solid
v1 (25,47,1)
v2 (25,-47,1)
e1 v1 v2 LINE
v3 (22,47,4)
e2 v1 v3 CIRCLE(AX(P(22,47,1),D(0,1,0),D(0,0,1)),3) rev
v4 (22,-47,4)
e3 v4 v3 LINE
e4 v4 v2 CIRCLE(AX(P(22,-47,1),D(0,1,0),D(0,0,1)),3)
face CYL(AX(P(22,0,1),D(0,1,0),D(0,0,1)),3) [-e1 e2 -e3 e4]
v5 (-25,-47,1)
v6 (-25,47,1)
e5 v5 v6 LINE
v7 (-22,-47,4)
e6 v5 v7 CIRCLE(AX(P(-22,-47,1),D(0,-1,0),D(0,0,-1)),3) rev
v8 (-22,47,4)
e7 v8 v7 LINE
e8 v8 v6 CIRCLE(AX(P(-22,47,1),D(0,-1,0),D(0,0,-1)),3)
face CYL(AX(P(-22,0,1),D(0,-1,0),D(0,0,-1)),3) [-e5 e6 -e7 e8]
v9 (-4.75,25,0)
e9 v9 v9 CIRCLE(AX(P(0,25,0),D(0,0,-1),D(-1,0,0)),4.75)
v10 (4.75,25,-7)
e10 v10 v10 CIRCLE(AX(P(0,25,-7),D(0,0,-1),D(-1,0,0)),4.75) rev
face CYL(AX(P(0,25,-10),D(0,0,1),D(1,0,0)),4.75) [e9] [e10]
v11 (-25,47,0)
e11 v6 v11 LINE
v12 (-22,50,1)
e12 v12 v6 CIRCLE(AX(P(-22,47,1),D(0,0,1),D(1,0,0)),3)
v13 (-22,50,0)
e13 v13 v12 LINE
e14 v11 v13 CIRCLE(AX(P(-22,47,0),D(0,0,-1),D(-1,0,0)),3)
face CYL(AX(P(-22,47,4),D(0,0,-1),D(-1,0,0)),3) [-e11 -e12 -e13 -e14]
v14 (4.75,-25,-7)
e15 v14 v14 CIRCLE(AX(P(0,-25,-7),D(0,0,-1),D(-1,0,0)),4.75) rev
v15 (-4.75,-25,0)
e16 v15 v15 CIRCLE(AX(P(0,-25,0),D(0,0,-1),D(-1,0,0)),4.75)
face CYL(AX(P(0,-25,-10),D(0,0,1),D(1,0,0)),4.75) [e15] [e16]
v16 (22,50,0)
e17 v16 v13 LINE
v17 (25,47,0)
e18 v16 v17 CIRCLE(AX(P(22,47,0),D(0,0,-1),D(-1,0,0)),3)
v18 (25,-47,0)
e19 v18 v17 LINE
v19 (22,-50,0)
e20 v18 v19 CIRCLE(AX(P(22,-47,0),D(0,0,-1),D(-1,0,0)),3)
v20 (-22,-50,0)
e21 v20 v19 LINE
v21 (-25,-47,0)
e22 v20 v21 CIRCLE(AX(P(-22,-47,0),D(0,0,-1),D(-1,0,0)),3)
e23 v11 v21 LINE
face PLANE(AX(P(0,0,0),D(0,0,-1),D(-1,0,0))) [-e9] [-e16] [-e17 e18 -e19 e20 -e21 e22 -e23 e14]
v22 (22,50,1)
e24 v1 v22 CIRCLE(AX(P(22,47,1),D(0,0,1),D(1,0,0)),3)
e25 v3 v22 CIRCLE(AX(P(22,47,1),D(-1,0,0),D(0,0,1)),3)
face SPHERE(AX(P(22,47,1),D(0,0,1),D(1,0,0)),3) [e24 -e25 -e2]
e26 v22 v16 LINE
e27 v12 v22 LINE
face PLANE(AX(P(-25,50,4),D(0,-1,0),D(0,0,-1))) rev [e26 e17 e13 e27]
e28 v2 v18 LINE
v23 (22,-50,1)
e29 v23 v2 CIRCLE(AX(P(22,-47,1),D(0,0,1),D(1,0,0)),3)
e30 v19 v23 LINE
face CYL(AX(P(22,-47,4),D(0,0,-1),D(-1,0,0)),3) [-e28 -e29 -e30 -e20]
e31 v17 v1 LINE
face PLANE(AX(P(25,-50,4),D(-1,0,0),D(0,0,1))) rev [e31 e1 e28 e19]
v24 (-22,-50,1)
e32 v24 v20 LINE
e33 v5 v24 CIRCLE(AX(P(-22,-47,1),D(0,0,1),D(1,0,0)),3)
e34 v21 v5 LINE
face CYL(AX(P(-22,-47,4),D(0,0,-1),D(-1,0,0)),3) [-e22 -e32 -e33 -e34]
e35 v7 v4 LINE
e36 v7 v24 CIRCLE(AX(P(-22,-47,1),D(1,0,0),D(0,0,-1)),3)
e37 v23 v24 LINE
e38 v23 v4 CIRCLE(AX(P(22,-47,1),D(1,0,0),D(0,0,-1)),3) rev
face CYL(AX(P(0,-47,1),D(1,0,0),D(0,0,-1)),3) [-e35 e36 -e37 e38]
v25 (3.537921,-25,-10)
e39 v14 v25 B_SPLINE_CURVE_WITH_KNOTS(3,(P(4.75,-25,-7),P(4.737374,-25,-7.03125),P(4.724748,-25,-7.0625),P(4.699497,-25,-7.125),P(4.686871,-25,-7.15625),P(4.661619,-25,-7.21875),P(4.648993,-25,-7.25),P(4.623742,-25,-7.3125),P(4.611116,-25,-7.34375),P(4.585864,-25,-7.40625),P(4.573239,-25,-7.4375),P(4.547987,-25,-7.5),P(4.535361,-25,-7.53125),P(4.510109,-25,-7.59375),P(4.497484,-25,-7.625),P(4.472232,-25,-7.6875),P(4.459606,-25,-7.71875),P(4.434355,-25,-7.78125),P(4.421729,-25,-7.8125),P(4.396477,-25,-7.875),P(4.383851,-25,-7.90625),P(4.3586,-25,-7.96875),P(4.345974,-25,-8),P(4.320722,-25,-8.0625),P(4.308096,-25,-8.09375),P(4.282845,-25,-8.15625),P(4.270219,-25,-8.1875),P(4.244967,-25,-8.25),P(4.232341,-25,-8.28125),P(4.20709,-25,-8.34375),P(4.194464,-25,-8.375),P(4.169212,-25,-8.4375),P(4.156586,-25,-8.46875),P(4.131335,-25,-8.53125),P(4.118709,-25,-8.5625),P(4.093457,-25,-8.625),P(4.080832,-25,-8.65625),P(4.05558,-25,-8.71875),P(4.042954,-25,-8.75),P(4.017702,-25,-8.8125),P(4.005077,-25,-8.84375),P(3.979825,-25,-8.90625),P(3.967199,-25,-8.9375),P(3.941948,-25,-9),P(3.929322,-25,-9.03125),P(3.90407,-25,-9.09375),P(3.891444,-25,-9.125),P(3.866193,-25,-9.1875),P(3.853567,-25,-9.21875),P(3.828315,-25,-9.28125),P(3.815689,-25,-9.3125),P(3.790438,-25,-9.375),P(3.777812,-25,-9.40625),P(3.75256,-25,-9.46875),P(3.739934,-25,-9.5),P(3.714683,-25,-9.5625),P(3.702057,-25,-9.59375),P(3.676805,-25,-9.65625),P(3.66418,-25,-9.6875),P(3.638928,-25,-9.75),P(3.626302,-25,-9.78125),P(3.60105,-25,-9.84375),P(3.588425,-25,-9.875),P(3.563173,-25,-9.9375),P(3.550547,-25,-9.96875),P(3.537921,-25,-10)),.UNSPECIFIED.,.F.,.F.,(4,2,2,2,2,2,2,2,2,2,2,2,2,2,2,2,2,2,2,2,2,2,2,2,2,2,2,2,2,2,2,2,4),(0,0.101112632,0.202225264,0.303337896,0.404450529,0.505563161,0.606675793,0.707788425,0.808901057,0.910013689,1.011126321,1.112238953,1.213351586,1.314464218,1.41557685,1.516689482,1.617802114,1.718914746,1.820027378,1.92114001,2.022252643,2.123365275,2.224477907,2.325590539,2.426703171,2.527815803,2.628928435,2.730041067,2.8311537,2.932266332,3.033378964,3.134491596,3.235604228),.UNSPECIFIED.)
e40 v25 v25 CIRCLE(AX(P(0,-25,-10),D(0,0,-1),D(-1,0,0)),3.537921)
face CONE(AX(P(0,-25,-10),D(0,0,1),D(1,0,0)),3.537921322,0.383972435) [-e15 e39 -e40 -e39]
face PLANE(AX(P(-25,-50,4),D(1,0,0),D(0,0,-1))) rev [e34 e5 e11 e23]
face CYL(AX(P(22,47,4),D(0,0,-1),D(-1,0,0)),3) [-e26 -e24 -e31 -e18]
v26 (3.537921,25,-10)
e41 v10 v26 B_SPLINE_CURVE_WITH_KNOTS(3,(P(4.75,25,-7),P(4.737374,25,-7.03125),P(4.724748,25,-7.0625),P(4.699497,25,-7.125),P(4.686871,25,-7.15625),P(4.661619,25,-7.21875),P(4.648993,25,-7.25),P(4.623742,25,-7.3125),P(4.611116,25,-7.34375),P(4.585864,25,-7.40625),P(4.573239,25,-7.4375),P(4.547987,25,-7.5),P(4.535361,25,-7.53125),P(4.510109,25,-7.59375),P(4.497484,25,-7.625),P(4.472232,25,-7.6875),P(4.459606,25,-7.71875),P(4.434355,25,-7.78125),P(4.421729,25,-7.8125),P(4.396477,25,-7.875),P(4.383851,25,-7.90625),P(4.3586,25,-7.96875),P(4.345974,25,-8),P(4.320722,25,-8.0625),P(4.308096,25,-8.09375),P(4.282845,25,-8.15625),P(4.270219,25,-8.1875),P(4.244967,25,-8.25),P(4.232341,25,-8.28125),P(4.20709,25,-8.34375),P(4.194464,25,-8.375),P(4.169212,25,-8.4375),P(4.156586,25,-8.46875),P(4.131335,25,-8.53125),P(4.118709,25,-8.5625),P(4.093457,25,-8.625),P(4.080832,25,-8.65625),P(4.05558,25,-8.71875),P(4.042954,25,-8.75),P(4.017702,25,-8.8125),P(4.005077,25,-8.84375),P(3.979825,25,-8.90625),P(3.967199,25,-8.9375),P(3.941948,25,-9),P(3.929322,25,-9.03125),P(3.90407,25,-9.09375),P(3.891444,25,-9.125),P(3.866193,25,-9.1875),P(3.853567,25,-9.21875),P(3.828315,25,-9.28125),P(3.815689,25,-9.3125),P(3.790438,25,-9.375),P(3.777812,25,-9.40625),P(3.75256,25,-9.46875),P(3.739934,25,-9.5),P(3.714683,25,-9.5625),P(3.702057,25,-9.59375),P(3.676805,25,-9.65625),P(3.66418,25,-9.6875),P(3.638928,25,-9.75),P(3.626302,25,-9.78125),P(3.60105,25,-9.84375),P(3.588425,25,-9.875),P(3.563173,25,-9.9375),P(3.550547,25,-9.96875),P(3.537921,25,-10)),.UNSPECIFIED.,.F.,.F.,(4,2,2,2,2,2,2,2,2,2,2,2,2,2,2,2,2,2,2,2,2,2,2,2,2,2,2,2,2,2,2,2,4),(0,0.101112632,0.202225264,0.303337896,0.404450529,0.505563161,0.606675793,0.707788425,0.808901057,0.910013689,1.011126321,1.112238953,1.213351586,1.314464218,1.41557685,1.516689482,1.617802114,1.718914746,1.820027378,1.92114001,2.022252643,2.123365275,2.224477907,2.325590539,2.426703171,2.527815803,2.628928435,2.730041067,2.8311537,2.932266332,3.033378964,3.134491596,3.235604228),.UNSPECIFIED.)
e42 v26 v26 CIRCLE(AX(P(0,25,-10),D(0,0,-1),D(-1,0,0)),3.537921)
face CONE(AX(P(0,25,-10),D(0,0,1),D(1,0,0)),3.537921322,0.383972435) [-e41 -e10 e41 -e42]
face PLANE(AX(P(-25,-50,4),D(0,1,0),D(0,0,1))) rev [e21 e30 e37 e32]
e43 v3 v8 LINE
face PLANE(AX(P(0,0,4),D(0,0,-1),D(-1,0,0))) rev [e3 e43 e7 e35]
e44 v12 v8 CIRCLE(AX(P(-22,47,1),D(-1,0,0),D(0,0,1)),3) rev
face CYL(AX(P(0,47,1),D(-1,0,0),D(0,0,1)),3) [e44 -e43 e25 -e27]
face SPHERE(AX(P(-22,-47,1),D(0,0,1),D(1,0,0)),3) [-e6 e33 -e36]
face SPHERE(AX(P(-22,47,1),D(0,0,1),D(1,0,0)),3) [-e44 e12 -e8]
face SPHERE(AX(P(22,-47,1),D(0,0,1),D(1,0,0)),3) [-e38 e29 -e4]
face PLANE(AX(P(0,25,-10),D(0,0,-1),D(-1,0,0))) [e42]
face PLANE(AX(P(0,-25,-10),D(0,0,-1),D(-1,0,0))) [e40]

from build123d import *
from OCP.BRepFilletAPI import BRepFilletAPI_MakeChamfer

# Parameters (mm, degrees)
SKETCH1_W           = 50
SKETCH1_H           = 100
BOSS_EXTRUDE1_DEPTH = 4
FILLET1_R           = 3
FILLET2_R           = 3
SKETCH2_R           = 4.75
BOSS_EXTRUDE2_DEPTH = 10
CHAMFER1_SIZE       = 3
CHAMFER1_SIZE2      = 1.212078678


with BuildPart() as part:
    # Sketch1 → Boss-Extrude1 (new body)
    with BuildSketch(Plane.XY):
        Rectangle(SKETCH1_W, SKETCH1_H)
    extrude(amount=BOSS_EXTRUDE1_DEPTH)

    # Fillet1
    fillet1_edges = [part.edges().sort_by_distance(p)[0] for p in [
        (-25, 0, 4),
        (0, -50, 4),
        (25, 0, 4),
        (0, 50, 4),
    ]]
    fillet(fillet1_edges, radius=FILLET1_R)

    # Fillet2
    # the kernel refuses this fillet: 3 mm, written as the material it takes off along each edge
    with BuildSketch(Plane(origin=(-22, 47, 1), x_dir=(0, 1, 0), z_dir=(-1, 0, 0))) as fillet2_piece_1_section:
        Polygon((0, 0), (FILLET2_R, 0), (FILLET2_R, -FILLET2_R), (0, -FILLET2_R), align=None)
    fillet2_piece_1 = extrude(amount=FILLET2_R, mode=Mode.PRIVATE)
    fillet2_piece_1 = fillet2_piece_1 - Plane(origin=(-22, 47, 1), x_dir=(0, -0.7071067811865475, -0.7071067811865475), z_dir=(-1, 0, 0)) * Sphere(FILLET2_R, mode=Mode.PRIVATE)
    add(fillet2_piece_1, mode=Mode.SUBTRACT)
    with BuildSketch(Plane(origin=(22, 47, 1), x_dir=(0, 1, 0), z_dir=(1, 0, 0))) as fillet2_piece_2_section:
        Polygon((0, 0), (FILLET2_R, 0), (FILLET2_R, FILLET2_R), (0, FILLET2_R), align=None)
    fillet2_piece_2 = extrude(amount=FILLET2_R, mode=Mode.PRIVATE)
    fillet2_piece_2 = fillet2_piece_2 - Plane(origin=(22, 47, 1), x_dir=(0, -0.7071067811865475, -0.7071067811865475), z_dir=(1, 0, 0)) * Sphere(FILLET2_R, mode=Mode.PRIVATE)
    add(fillet2_piece_2, mode=Mode.SUBTRACT)
    with BuildSketch(Plane(origin=(-22, -47, 1), x_dir=(-1, 0, 0), z_dir=(0, -1, 0))) as fillet2_piece_3_section:
        Polygon((0, 0), (FILLET2_R, 0), (FILLET2_R, -FILLET2_R), (0, -FILLET2_R), align=None)
    fillet2_piece_3 = extrude(amount=FILLET2_R, mode=Mode.PRIVATE)
    fillet2_piece_3 = fillet2_piece_3 - Plane(origin=(-22, -47, 1), x_dir=(0.7071067811865475, 0, -0.7071067811865475), z_dir=(0, -1, 0)) * Sphere(FILLET2_R, mode=Mode.PRIVATE)
    add(fillet2_piece_3, mode=Mode.SUBTRACT)
    with BuildSketch(Plane(origin=(22, -47, 1), x_dir=(1, 0, 0), z_dir=(0, -1, 0))) as fillet2_piece_4_section:
        Polygon((0, 0), (FILLET2_R, 0), (FILLET2_R, FILLET2_R), (0, FILLET2_R), align=None)
    fillet2_piece_4 = extrude(amount=FILLET2_R, mode=Mode.PRIVATE)
    fillet2_piece_4 = fillet2_piece_4 - Plane(origin=(22, -47, 1), x_dir=(-0.7071067811865475, 0, -0.7071067811865475), z_dir=(0, -1, 0)) * Sphere(FILLET2_R, mode=Mode.PRIVATE)
    add(fillet2_piece_4, mode=Mode.SUBTRACT)
    with BuildSketch(Plane(origin=(25, -50, -7.5), x_dir=(-1, 0, 0), z_dir=(0, 0, 1)), Plane(origin=(25, 50, -7.5), x_dir=(0, -1, 0), z_dir=(0, 0, 1))) as fillet2_piece_5:
        with BuildLine():
            CenterArc((FILLET2_R, -FILLET2_R), FILLET2_R, 90, 90)
            Line((0, -FILLET2_R), (0, 0))
            Line((0, 0), (FILLET2_R, 0))
        make_face()
    extrude(amount=8.5, mode=Mode.SUBTRACT)
    with BuildSketch(Plane(origin=(-25, -50, -7.5), x_dir=(1, 0, 0), z_dir=(0, 0, 1)), Plane(origin=(-25, 50, -7.5), x_dir=(0, -1, 0), z_dir=(0, 0, 1))) as fillet2_piece_6:
        with BuildLine():
            CenterArc((FILLET2_R, FILLET2_R), FILLET2_R, 180, 90)
            Line((0, FILLET2_R), (0, 0))
            Line((0, 0), (FILLET2_R, 0))
        make_face()
    extrude(amount=8.5, mode=Mode.SUBTRACT)

    # Sketch2 → Boss-Extrude2 (add)
    with BuildSketch(Plane(origin=(0, 0, 0), x_dir=(-1, 0, 0), z_dir=(0, 0, -1))):
        with Locations((0, 25)):
            Circle(SKETCH2_R)
        with Locations((0, -25)):
            Circle(SKETCH2_R)
    extrude(amount=BOSS_EXTRUDE2_DEPTH)

    # Chamfer1: one chamfer whose edges measure the first distance from different faces: ONE call of the kernel's chamfer builder (chamfer() names one face for all edges)
    chamfer1_edges_1 = [part.edges().sort_by_distance(p)[0] for p in [
        (4.75, 25, -10),
    ]]
    chamfer1_side_1 = [part.faces().sort_by_distance(p)[0] for p in [
        (4.75, 25, -5),
    ]]
    chamfer1_edges_2 = [part.edges().sort_by_distance(p)[0] for p in [
        (4.75, -25, -10),
    ]]
    chamfer1_side_2 = [part.faces().sort_by_distance(p)[0] for p in [
        (4.75, -25, -5),
    ]]
    chamfer1 = BRepFilletAPI_MakeChamfer(part.part.solid().wrapped)
    for e in chamfer1_edges_1:
        chamfer1.Add(CHAMFER1_SIZE, CHAMFER1_SIZE2, e.wrapped, chamfer1_side_1[0].wrapped)  # the first distance lies on this face
    for e in chamfer1_edges_2:
        chamfer1.Add(CHAMFER1_SIZE, CHAMFER1_SIZE2, e.wrapped, chamfer1_side_2[0].wrapped)  # the first distance lies on this face
    add(Compound.cast(chamfer1.Shape()), mode=Mode.REPLACE)


solid = part.part
